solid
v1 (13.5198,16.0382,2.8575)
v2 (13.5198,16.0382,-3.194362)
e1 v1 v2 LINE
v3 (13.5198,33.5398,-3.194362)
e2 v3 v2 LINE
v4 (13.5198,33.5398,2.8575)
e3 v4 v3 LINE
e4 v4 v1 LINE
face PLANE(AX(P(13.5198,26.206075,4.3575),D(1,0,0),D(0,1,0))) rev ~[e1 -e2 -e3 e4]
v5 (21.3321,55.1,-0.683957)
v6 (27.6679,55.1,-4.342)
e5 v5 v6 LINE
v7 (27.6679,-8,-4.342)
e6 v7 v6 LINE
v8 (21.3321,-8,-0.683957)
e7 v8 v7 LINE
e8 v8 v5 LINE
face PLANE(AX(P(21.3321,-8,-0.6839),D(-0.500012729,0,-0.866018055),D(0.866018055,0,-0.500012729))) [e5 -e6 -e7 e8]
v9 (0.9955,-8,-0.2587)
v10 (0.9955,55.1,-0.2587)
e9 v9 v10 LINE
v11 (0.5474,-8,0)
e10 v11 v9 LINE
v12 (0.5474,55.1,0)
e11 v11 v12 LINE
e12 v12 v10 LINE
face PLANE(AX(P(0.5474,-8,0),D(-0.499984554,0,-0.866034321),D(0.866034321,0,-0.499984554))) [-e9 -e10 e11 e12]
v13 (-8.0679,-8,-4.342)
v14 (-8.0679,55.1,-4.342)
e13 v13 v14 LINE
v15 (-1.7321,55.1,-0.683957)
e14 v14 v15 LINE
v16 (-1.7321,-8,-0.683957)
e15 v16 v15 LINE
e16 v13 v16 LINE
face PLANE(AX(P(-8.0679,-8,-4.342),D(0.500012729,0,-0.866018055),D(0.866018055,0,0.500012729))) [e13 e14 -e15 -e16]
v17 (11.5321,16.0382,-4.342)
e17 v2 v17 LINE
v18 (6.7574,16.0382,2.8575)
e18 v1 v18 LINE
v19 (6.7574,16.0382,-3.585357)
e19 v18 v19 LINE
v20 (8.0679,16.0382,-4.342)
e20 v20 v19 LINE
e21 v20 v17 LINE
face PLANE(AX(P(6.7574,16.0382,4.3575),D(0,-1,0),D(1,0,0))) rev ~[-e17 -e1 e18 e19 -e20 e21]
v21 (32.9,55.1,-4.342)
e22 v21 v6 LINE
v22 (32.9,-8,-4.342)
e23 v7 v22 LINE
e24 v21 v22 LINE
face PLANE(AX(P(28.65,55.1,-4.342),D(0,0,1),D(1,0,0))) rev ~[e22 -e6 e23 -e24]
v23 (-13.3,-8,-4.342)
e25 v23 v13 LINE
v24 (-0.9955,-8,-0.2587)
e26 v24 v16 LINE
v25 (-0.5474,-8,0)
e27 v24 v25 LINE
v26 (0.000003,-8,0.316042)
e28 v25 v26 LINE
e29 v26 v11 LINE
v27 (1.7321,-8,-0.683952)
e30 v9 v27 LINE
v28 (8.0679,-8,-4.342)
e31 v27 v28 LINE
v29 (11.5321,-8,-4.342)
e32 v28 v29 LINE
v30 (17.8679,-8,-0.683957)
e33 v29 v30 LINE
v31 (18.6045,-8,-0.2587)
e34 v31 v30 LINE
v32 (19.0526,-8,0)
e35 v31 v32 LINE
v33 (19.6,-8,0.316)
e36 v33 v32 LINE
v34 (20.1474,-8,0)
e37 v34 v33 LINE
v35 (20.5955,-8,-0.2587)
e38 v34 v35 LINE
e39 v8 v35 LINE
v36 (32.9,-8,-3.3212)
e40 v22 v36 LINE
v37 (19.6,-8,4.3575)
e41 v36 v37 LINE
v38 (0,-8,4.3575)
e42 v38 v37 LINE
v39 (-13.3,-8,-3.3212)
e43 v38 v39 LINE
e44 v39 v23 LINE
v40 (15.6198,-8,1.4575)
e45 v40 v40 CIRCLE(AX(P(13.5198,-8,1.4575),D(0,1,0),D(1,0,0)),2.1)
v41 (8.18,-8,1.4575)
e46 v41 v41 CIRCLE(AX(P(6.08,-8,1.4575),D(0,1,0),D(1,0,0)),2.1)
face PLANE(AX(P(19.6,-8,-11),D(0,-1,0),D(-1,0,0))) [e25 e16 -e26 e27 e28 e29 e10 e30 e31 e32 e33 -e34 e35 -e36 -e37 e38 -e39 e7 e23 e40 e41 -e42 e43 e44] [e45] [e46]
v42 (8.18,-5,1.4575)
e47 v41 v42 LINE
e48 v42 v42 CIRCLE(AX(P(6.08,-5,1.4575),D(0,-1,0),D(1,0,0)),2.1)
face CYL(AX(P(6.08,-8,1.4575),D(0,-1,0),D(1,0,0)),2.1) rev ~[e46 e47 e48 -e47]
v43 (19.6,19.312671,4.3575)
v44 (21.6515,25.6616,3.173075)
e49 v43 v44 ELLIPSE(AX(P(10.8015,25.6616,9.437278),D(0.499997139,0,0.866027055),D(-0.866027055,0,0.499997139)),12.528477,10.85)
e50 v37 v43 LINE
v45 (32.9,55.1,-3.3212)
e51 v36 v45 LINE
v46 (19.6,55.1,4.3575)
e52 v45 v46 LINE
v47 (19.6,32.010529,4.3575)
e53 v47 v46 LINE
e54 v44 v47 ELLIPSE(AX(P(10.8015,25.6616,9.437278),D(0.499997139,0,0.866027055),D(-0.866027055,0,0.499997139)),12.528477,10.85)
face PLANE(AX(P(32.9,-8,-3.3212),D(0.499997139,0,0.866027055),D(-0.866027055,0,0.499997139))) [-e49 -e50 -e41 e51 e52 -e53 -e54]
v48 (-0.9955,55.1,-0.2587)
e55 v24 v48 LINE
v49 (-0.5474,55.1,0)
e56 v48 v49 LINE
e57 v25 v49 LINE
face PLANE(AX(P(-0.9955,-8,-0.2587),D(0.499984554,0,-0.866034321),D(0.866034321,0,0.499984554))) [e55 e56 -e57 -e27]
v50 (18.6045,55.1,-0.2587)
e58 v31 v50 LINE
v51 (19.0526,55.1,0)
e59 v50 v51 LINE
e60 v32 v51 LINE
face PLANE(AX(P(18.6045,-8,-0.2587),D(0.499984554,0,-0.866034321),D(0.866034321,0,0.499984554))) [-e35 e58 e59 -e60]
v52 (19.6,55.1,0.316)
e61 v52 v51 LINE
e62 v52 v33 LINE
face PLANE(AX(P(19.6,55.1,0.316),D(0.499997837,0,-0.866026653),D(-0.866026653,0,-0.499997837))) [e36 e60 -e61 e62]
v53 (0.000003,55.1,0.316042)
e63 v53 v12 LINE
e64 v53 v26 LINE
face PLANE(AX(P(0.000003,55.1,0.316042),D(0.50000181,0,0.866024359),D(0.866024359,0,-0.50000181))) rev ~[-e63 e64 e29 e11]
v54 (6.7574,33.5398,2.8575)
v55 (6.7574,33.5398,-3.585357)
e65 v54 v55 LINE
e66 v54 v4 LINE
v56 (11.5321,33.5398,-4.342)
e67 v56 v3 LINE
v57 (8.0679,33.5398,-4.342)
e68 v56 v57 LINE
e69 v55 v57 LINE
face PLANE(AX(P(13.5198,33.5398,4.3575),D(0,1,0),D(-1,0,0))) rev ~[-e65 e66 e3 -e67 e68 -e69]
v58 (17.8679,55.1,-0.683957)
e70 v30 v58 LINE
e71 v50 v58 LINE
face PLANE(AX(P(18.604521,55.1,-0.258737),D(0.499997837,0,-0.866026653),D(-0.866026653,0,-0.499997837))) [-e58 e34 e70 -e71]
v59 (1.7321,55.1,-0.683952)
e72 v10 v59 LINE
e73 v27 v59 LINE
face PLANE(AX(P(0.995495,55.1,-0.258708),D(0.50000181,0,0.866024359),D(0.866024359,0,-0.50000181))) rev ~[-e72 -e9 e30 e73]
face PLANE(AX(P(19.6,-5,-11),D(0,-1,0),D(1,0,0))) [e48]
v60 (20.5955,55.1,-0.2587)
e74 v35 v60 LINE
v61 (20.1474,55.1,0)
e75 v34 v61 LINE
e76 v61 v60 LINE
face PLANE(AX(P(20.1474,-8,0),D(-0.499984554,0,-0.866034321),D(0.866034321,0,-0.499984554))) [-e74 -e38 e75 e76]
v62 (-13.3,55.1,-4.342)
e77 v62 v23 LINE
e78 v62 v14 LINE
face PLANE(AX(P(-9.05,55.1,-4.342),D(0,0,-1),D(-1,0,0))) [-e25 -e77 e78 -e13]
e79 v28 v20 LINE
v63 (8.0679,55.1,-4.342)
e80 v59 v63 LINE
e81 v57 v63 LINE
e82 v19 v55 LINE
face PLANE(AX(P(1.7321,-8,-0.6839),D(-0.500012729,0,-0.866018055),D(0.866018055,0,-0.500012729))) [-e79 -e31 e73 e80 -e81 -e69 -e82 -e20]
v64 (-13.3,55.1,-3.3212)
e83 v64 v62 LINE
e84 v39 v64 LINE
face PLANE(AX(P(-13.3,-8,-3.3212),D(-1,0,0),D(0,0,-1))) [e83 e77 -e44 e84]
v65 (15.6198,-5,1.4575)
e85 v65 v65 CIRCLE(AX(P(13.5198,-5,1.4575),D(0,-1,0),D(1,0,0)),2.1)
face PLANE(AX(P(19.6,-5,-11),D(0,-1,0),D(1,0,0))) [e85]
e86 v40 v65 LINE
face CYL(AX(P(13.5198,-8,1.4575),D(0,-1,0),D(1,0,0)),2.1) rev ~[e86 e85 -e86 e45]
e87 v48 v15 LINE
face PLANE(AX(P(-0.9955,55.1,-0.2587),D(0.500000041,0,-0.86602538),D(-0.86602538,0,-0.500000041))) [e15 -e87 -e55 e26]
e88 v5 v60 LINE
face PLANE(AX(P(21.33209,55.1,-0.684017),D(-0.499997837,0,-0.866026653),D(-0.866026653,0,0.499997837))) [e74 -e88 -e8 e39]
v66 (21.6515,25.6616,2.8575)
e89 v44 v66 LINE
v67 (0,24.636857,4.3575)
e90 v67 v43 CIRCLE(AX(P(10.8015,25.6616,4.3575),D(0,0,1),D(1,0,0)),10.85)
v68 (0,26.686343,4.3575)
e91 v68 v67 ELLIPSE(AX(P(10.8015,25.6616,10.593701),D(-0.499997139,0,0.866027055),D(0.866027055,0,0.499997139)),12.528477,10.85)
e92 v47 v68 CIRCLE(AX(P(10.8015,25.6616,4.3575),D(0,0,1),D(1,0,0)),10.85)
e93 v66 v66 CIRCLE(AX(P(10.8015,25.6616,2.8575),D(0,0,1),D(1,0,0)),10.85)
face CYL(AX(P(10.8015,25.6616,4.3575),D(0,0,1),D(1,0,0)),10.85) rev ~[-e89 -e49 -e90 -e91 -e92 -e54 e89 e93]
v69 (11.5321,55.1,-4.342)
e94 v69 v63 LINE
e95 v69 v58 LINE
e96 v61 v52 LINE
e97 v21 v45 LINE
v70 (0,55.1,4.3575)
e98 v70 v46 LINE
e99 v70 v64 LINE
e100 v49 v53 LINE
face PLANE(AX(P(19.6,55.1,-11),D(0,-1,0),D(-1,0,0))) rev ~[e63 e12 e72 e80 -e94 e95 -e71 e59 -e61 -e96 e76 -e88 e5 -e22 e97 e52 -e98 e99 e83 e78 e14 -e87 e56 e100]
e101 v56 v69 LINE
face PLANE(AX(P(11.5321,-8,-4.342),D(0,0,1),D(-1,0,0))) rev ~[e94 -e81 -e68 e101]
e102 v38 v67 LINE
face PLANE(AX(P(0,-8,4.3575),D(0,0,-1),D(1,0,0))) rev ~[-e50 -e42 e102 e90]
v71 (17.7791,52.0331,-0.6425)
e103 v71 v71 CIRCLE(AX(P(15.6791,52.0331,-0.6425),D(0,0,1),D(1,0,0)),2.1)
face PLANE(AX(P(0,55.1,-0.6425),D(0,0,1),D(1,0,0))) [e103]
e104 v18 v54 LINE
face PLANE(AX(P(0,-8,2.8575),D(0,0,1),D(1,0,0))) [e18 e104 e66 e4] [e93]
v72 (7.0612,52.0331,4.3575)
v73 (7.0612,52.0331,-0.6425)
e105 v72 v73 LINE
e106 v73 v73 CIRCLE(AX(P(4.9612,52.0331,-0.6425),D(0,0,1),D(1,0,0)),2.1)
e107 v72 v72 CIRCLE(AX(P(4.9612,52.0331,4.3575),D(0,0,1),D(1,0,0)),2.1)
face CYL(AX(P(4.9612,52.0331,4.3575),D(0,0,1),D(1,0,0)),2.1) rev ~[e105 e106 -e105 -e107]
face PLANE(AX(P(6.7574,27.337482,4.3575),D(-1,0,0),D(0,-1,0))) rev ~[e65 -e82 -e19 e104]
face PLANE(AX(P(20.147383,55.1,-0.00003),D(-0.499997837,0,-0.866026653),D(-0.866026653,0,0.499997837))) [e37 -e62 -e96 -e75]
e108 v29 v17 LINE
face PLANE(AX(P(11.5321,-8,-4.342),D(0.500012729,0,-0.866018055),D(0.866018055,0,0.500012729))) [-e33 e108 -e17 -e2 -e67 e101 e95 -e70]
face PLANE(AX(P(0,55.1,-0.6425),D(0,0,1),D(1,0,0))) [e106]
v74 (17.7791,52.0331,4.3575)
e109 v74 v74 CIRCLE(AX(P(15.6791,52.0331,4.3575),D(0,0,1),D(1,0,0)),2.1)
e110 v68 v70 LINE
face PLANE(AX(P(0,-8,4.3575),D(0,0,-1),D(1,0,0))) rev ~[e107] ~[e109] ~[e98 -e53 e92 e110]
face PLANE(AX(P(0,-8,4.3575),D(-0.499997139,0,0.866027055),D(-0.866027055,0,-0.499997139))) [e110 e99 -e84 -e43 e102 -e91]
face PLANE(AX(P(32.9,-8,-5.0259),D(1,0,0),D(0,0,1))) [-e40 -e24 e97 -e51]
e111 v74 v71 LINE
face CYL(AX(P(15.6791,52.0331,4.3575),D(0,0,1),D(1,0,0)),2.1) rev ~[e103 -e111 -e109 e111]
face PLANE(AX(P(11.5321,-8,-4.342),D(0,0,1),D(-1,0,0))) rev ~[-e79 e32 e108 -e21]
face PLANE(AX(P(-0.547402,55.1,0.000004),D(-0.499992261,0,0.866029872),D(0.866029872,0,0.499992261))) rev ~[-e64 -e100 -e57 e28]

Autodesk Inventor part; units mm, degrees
ref_plane "YZ Plane" through (0, 0, 0) normal (1, 0, 0) x (0, 1, 0)
ref_plane "XZ Plane" through (0, 0, 0) normal (0, 1, 0) x (-1, 0, 0)
ref_plane "РабПлоскость1" through (19.6, -8, -11) normal (0, -1, 0) x (-1, 0, 0)
sketch "Эскиз1" plane through (19.6, -8, -11) normal (0, -1, 0) x (-1, 0, 0)
  line L0 (29.4, -5.9741) -> (29.4, 5.9741) projected
  line L1 (28.2551, 5.9741) -> (29.4, 5.9741) projected
  line L2 (28.65, 6.658) -> (28.2551, 5.9741) projected
  line L3 (27.6679, 6.658) -> (28.65, 6.658) projected
  line L4 (21.3321, 10.3161) -> (27.6679, 6.658) projected
  line L5 (21.3321, 10.3161) -> (20.35, 10.3161) projected
  line L6 (20.35, 10.3161) -> (20.5955, 10.7413) projected
  line L7 (20.1474, 11) -> (20.5955, 10.7413) projected
  line L8 (20.1474, 11) -> (19.0526, 11) projected
  line L9 (18.6045, 10.7413) -> (19.0526, 11) projected
  line L10 (18.85, 10.3161) -> (18.6045, 10.7413) projected
  line L11 (17.8679, 10.3161) -> (18.85, 10.3161) projected
  line L12 (11.5321, 6.658) -> (17.8679, 10.3161) projected
  line L13 (11.5321, 6.658) -> (10.55, 6.658) projected
  line L14 (10.55, 6.658) -> (10.9449, 5.9741) projected
  line L15 (8.6551, 5.9741) -> (10.9449, 5.9741) projected
  line L16 (9.05, 6.658) -> (8.6551, 5.9741) projected
  line L17 (8.0679, 6.658) -> (9.05, 6.658) projected
  line L18 (1.7321, 10.3161) -> (8.0679, 6.658) projected
  line L19 (1.7321, 10.3161) -> (0.75, 10.3161) projected
  line L20 (0.75, 10.3161) -> (0.9955, 10.7413) projected
  line L21 (0.5474, 11) -> (0.9955, 10.7413) projected
  line L22 (-0.5474, 11) -> (0.5474, 11) projected
  line L23 (-0.9955, 10.7413) -> (-0.5474, 11) projected
  line L24 (-0.75, 10.3161) -> (-0.9955, 10.7413) projected
  line L25 (-1.7321, 10.3161) -> (-0.75, 10.3161) projected
  line L26 (-8.0679, 6.658) -> (-1.7321, 10.3161) projected
  line L27 (-8.0679, 6.658) -> (-9.05, 6.658) projected
  line L28 (-9.05, 6.658) -> (-8.6551, 5.9741) projected
  line L29 (-8.6551, 5.9741) -> (-9.8, 5.9741) projected
  line L30 (-9.8, -5.9741) -> (-9.8, 5.9741) projected
  line L31 (-8.6551, -5.9741) -> (-9.8, -5.9741) projected
  line L32 (-9.05, -6.658) -> (-8.6551, -5.9741) projected
  line L33 (-8.0679, -6.658) -> (-9.05, -6.658) projected
  line L34 (-1.7321, -10.3161) -> (-8.0679, -6.658) projected
  line L35 (-1.7321, -10.3161) -> (-0.75, -10.3161) projected
  line L36 (-0.75, -10.3161) -> (-0.9955, -10.7413) projected
  line L37 (-0.5474, -11) -> (-0.9955, -10.7413) projected
  line L38 (-0.5474, -11) -> (0.5474, -11) projected
  line L39 (0.9955, -10.7413) -> (0.5474, -11) projected
  line L40 (0.75, -10.3161) -> (0.9955, -10.7413) projected
  line L41 (1.7321, -10.3161) -> (0.75, -10.3161) projected
  line L42 (8.0679, -6.658) -> (1.7321, -10.3161) projected
  line L43 (8.0679, -6.658) -> (9.05, -6.658) projected
  line L44 (9.05, -6.658) -> (8.6551, -5.9741) projected
  line L45 (8.6551, -5.9741) -> (10.9449, -5.9741) projected
  line L46 (10.55, -6.658) -> (10.9449, -5.9741) projected
  line L47 (11.5321, -6.658) -> (10.55, -6.658) projected
  line L48 (17.8679, -10.3161) -> (11.5321, -6.658) projected
  line L49 (17.8679, -10.3161) -> (18.85, -10.3161) projected
  line L50 (18.85, -10.3161) -> (18.6045, -10.7413) projected
  line L51 (19.0526, -11) -> (18.6045, -10.7413) projected
  line L52 (19.0526, -11) -> (20.1474, -11) projected
  line L53 (20.5955, -10.7413) -> (20.1474, -11) projected
  line L54 (20.35, -10.3161) -> (20.5955, -10.7413) projected
  line L55 (21.3321, -10.3161) -> (20.35, -10.3161) projected
  line L56 (27.6679, -6.658) -> (21.3321, -10.3161) projected
  line L57 (27.6679, -6.658) -> (28.65, -6.658) projected
  line L58 (28.65, -6.658) -> (28.2551, -5.9741) projected
  line L59 (28.2551, -5.9741) -> (29.4, -5.9741) projected
  circle A0 centre (0, 0) radius 8.1 projected
  circle A1 centre (19.6, 0) radius 8.1 projected
  line L60 (32.9, 3.6373) -> (42.7, 9.2953) projected
  line L61 (42.7, 9.2953) -> (42.7, 24.6529) projected
  line L62 (42.7, 24.6529) -> (29.4, 32.3316) projected
  line L63 (29.4, 32.3316) -> (19.6, 26.6736) projected
  line L64 (19.6, 26.6736) -> (9.8, 32.3316) projected
  line L65 (9.8, 32.3316) -> (0, 26.6736) projected
  line L66 (0, 26.6736) -> (-9.8, 32.3316) projected
  line L67 (-9.8, 32.3316) -> (-23.1, 24.6529) projected
  line L68 (-23.1, 24.6529) -> (-23.1, 9.2953) projected
  line L69 (-23.1, 9.2953) -> (-13.3, 3.6373) projected
  line L70 (-13.3, 3.6373) -> (-13.3, -7.6788) projected
  line L71 (29.4, -5.9741) -> (28.2551, -5.9741) projected
  line L72 (28.2551, -5.9741) -> (28.65, -6.658) projected
  line L73 (28.65, -6.658) -> (27.6679, -6.658) projected
  line L74 (27.6679, -6.658) -> (21.3321, -10.3161) projected
  line L75 (17.8679, -10.3161) -> (11.5321, -6.658) projected
  line L76 (11.5321, -6.658) -> (10.55, -6.658) projected
  line L77 (10.55, -6.658) -> (10.9449, -5.9741) projected
  line L78 (10.9449, -5.9741) -> (8.6551, -5.9741) projected
  line L79 (8.6551, -5.9741) -> (9.05, -6.658) projected
  line L80 (9.05, -6.658) -> (8.0679, -6.658) projected
  line L81 (8.0679, -6.658) -> (1.7321, -10.3161) projected
  line L82 (-1.7321, -10.3161) -> (-8.0679, -6.658) projected
  line L83 (-8.0679, -6.658) -> (-9.05, -6.658) projected
  line L84 (-9.05, -6.658) -> (-8.6551, -5.9741) projected
  line L85 (-8.6551, -5.9741) -> (-9.8, -5.9741) projected
  line L86 (-9.8, -5.9741) -> (-9.8, 5.9741) projected
  line L87 (-9.8, 5.9741) -> (-10.3474, 5.9741) projected
  line L88 (-10.3474, 5.9741) -> (-10.7955, 6.2328) projected
  line L89 (-10.7955, 6.2328) -> (-10.55, 6.658) projected
  line L90 (-10.55, 6.658) -> (-11.5321, 6.658) projected
  line L91 (-11.5321, 6.658) -> (-17.8679, 10.3161) projected
  line L92 (-17.8679, 10.3161) -> (-18.85, 10.3161) projected
  line L93 (-18.85, 10.3161) -> (-18.4551, 11) projected
  line L94 (-18.4551, 11) -> (-19.6, 11) projected
  line L95 (-19.6, 11) -> (-19.6, 22.9482) projected
  line L96 (-19.6, 22.9482) -> (-18.4551, 22.9482) projected
  line L97 (-18.4551, 22.9482) -> (-18.85, 23.6321) projected
  line L98 (-18.85, 23.6321) -> (-17.8679, 23.6321) projected
  line L99 (-17.8679, 23.6321) -> (-11.5321, 27.2902) projected
  line L100 (-11.5321, 27.2902) -> (-10.55, 27.2902) projected
  line L101 (-10.55, 27.2902) -> (-10.7955, 27.7154) projected
  line L102 (-10.7955, 27.7154) -> (-10.3474, 27.9741) projected
  line L103 (-10.3474, 27.9741) -> (-9.2526, 27.9741) projected
  line L104 (-9.2526, 27.9741) -> (-8.8045, 27.7154) projected
  line L105 (-8.8045, 27.7154) -> (-9.05, 27.2902) projected
  line L106 (-9.05, 27.2902) -> (-8.0679, 27.2902) projected
  line L107 (-8.0679, 27.2902) -> (-1.7321, 23.6321) projected
  line L108 (-1.7321, 23.6321) -> (-0.75, 23.6321) projected
  line L109 (-0.75, 23.6321) -> (-1.1449, 22.9482) projected
  line L110 (-1.1449, 22.9482) -> (1.1449, 22.9482) projected
  line L111 (1.1449, 22.9482) -> (0.75, 23.6321) projected
  line L112 (0.75, 23.6321) -> (1.7321, 23.6321) projected
  line L113 (1.7321, 23.6321) -> (8.0679, 27.2902) projected
  line L114 (8.0679, 27.2902) -> (9.05, 27.2902) projected
  line L115 (9.05, 27.2902) -> (8.8045, 27.7154) projected
  line L116 (8.8045, 27.7154) -> (9.2526, 27.9741) projected
  line L117 (9.2526, 27.9741) -> (10.3474, 27.9741) projected
  line L118 (10.3474, 27.9741) -> (10.7955, 27.7154) projected
  line L119 (10.7955, 27.7154) -> (10.55, 27.2902) projected
  line L120 (10.55, 27.2902) -> (11.5321, 27.2902) projected
  line L121 (11.5321, 27.2902) -> (17.8679, 23.6321) projected
  line L122 (17.8679, 23.6321) -> (18.85, 23.6321) projected
  line L123 (18.85, 23.6321) -> (18.4551, 22.9482) projected
  line L124 (18.4551, 22.9482) -> (20.7449, 22.9482) projected
  line L125 (20.7449, 22.9482) -> (20.35, 23.6321) projected
  line L126 (20.35, 23.6321) -> (21.3321, 23.6321) projected
  line L127 (21.3321, 23.6321) -> (27.6679, 27.2902) projected
  line L128 (27.6679, 27.2902) -> (28.65, 27.2902) projected
  line L129 (28.65, 27.2902) -> (28.4045, 27.7154) projected
  line L130 (28.4045, 27.7154) -> (28.8526, 27.9741) projected
  line L131 (28.8526, 27.9741) -> (29.9474, 27.9741) projected
  line L132 (29.9474, 27.9741) -> (30.3955, 27.7154) projected
  line L133 (30.3955, 27.7154) -> (30.15, 27.2902) projected
  line L134 (30.15, 27.2902) -> (31.1321, 27.2902) projected
  line L135 (31.1321, 27.2902) -> (37.4679, 23.6321) projected
  line L136 (37.4679, 23.6321) -> (38.45, 23.6321) projected
  line L137 (38.45, 23.6321) -> (38.0551, 22.9482) projected
  line L138 (38.0551, 22.9482) -> (39.2, 22.9482) projected
  line L139 (39.2, 22.9482) -> (39.2, 11) projected
  line L140 (39.2, 11) -> (38.0551, 11) projected
  line L141 (38.0551, 11) -> (38.45, 10.3161) projected
  line L142 (38.45, 10.3161) -> (37.4679, 10.3161) projected
  line L143 (37.4679, 10.3161) -> (31.1321, 6.658) projected
  line L144 (31.1321, 6.658) -> (30.15, 6.658) projected
  line L145 (30.15, 6.658) -> (30.3955, 6.2328) projected
  line L146 (30.3955, 6.2328) -> (29.9474, 5.9741) projected
  line L147 (29.9474, 5.9741) -> (29.4, 5.9741) projected
  line L148 (29.4, 5.9741) -> (29.4, -5.9741) projected
  line L149 (-13.3, -7.6788) -> (0, -15.3575) projected
  line L150 (0, -15.3575) -> (9.8, -9.6995) projected
  line L151 (9.8, -9.6995) -> (19.6, -15.3575) projected
  line L152 (19.6, -15.3575) -> (32.9, -7.6788) projected
  line L153 (32.9, -7.6788) -> (32.9, 3.6373) projected
  line L154 (21.3321, -10.3161) -> (20.35, -10.3161) projected
  line L155 (20.35, -10.3161) -> (20.5955, -10.7413) projected
  line L156 (20.5955, -10.7413) -> (20.1474, -11) projected
  line L157 (20.1474, -11) -> (19.0526, -11) projected
  line L158 (19.0526, -11) -> (18.6045, -10.7413) projected
  line L159 (18.6045, -10.7413) -> (18.85, -10.3161) projected
  line L160 (18.85, -10.3161) -> (17.8679, -10.3161) projected
  line L161 (1.7321, -10.3161) -> (0.75, -10.3161) projected
  line L162 (0.75, -10.3161) -> (0.9955, -10.7413) projected
  line L163 (0.9955, -10.7413) -> (0.5474, -11) projected
  line L164 (0.5474, -11) -> (-0.5474, -11) projected
  line L165 (-0.5474, -11) -> (-0.9955, -10.7413) projected
  line L166 (-0.9955, -10.7413) -> (-0.75, -10.3161) projected
  line L167 (-0.75, -10.3161) -> (-1.7321, -10.3161) projected
  line L168 (32.9, -5.9741) -> (29.4, -5.9741)
  line L169 (-9.8, -5.9741) -> (-13.3, -5.9741)
  line L170 (19.6, -15.3575) -> (0, -15.3575)
  point P0 (19.6, -11)
ref_plane "РабПлоскость2" through (-38.0502, 55.1, -60.2624) normal (0, -1, 0) x (1, 0, 0)
extrude "Выдавливание1" add sketch "Эскиз1" against normal up to surface (63.1 mm away) contours L168 L153 L152 L151 L150 L149 L70 L169 L31 L32 L33 L34 L35 L36 L37 L38 L39 L40 L41 L42 L43 L44 L45 L46 L47 L48 L49 L50 L51 L52 L53 L54 L55 L56 L57 L58 L59 | L170 L150 L151
sketch "Эскиз2" plane through (0, -8, 4.3575) normal (0, 0, 1) x (1, 0, 0)
  circle A0 centre (10.0964, 32.8819) radius 10.85 projected
  spline S0 degree 3 poles (1.2199, 29.8332) (1.2264, 29.8391) (1.2399, 29.8514) (1.2666, 29.8618) (1.2971, 29.8679) (1.3188, 29.8674) (1.3303, 29.8671) knots 0 0 0 0 0.219432 0.455746 0.710361 1 1 1 1 projected
  line L0 (1.3303, 29.8671) -> (4.8998, 29.6603) projected
  line L1 (4.8998, 29.6603) -> (4.9412, 30.3747) projected
  spline S1 degree 3 poles (4.9412, 30.3747) (4.9436, 30.3952) (4.948, 30.4343) (4.9731, 30.4645) (4.9851, 30.4789) knots 0 0 0 0 0.523055 1 1 1 1 projected
  spline S2 degree 3 poles (4.9851, 30.4789) (5.0002, 30.4888) (5.0301, 30.5084) (5.0658, 30.5096) (5.0835, 30.5102) knots 0 0 0 0 0.505194 1 1 1 1 projected
  spline S3 degree 3 poles (5.0835, 30.5102) (5.0953, 30.507) (5.1242, 30.4991) (5.1574, 30.4755) (5.186, 30.4505) (5.2006, 30.4236) (5.2097, 30.3936) (5.2095, 30.3722) (5.2093, 30.3609) knots 0 0 0 0 0.170693 0.418909 0.563896 0.700202 0.841955 1 1 1 1 projected
  line L2 (5.2093, 30.3609) -> (5.1108, 28.6607) projected
  spline S4 degree 3 poles (5.1108, 28.6607) (5.1075, 28.6439) (5.1004, 28.6081) (5.064, 28.5657) (5.0204, 28.5312) (4.985, 28.5283) (4.9686, 28.5269) knots 0 0 0 0 0.239185 0.507115 0.772399 1 1 1 1 projected
  spline S5 degree 3 poles (4.9686, 28.5269) (4.9527, 28.5298) (4.9195, 28.5357) (4.8843, 28.5622) (4.8611, 28.5897) (4.8491, 28.6156) (4.842, 28.6452) (4.8426, 28.6661) (4.8429, 28.6771) knots 0 0 0 0 0.219722 0.460095 0.585443 0.71296 0.849405 1 1 1 1 projected
  line L3 (4.8429, 28.6771) -> (4.8843, 29.3923) projected
  line L4 (4.8843, 29.3923) -> (1.3148, 29.5991) projected
  spline S6 degree 3 poles (1.3148, 29.5991) (1.2937, 29.6014) (1.254, 29.6057) (1.2233, 29.6311) (1.2089, 29.6431) knots 0 0 0 0 0.529822 1 1 1 1 projected
  spline S7 degree 3 poles (1.2089, 29.6431) (1.1996, 29.6574) (1.1802, 29.6872) (1.1802, 29.7228) (1.1802, 29.7414) knots 0 0 0 0 0.479535 1 1 1 1 projected
  spline S8 degree 3 poles (1.1802, 29.7414) (1.1812, 29.7464) (1.1836, 29.7582) (1.1913, 29.7787) (1.2037, 29.8042) (1.2142, 29.8229) (1.2199, 29.8332) knots 0 0 0 0 0.152278 0.360896 0.649123 1 1 1 1 projected
  line L5 (5.314, 32.1682) -> (5.2899, 31.752) projected
  spline S9 degree 3 poles (5.2899, 31.752) (5.2876, 31.7272) (5.2829, 31.6758) (5.2703, 31.5966) (5.2484, 31.514) (5.2231, 31.428) (5.1921, 31.3426) (5.1551, 31.2607) (5.1134, 31.1842) (5.0808, 31.137) (5.0647, 31.1138) knots 0 0 0 0 0.109156 0.226197 0.350912 0.483159 0.618823 0.74875 0.876439 1 1 1 1 projected
  spline S10 degree 3 poles (5.0647, 31.1138) (5.0604, 31.1082) (5.0508, 31.0957) (5.0277, 31.0797) (4.9933, 31.0643) (4.9651, 31.0584) (4.9487, 31.055) knots 0 0 0 0 0.157275 0.353812 0.623959 1 1 1 1 projected
  spline S11 degree 3 poles (4.9487, 31.055) (4.931, 31.0577) (4.8944, 31.0635) (4.8502, 31.0969) (4.8148, 31.1372) (4.811, 31.1704) (4.8092, 31.1857) knots 0 0 0 0 0.254223 0.52772 0.782584 1 1 1 1 projected
  line L6 (4.8092, 31.1857) -> (4.839, 31.2655) projected
  spline S12 degree 3 poles (4.839, 31.2655) (4.8649, 31.302) (4.9161, 31.3743) (4.9704, 31.4963) (5.009, 31.625) (5.0173, 31.7147) (5.0215, 31.76) knots 0 0 0 0 0.250207 0.496054 0.745305 1 1 1 1 projected
  line L7 (5.0215, 31.76) -> (5.0462, 32.1871) projected
  spline S13 degree 3 poles (5.0462, 32.1871) (5.0465, 32.2279) (5.047, 32.3069) (5.0221, 32.4217) (4.9727, 32.5253) (4.9041, 32.6172) (4.8204, 32.6936) (4.7258, 32.7518) (4.6219, 32.7904) (4.5485, 32.7982) (4.5113, 32.8021) knots 0 0 0 0 0.134588 0.260434 0.384536 0.51119 0.637382 0.756913 0.876544 1 1 1 1 projected
  line L8 (4.5113, 32.8021) -> (4.3969, 32.8004) projected
  line L9 (4.3969, 32.8004) -> (4.3418, 32.7918) projected
  line L10 (4.3418, 32.7918) -> (4.2895, 32.7747) projected
  spline S14 degree 3 poles (4.2895, 32.7747) (4.2759, 32.7681) (4.2464, 32.7539) (4.201, 32.7264) (4.1502, 32.6923) (4.1153, 32.6662) (4.0967, 32.6522) knots 0 0 0 0 0.198705 0.428492 0.695375 1 1 1 1 projected
  line L11 (4.0967, 32.6522) -> (2.7508, 31.4386) projected
  spline S15 degree 3 poles (2.7508, 31.4386) (2.7287, 31.4196) (2.6853, 31.3821) (2.6147, 31.3335) (2.5398, 31.2938) (2.4871, 31.2738) (2.4608, 31.2638) knots 0 0 0 0 0.25594 0.505009 0.752321 1 1 1 1 projected
  line L12 (2.4608, 31.2638) -> (2.3941, 31.2441) projected
  line L13 (2.3941, 31.2441) -> (2.2844, 31.2219) projected
  line L14 (2.2844, 31.2219) -> (2.2184, 31.214) projected
  line L15 (2.2184, 31.214) -> (2.1355, 31.2188) projected
  spline S16 degree 3 poles (2.1355, 31.2188) (2.1073, 31.221) (2.0518, 31.2253) (1.9706, 31.2414) (1.8929, 31.264) (1.8193, 31.2949) (1.7487, 31.3318) (1.6814, 31.3759) (1.6185, 31.428) (1.5798, 31.4669) (1.5603, 31.4866) knots 0 0 0 0 0.130274 0.256409 0.380833 0.502298 0.624003 0.747576 0.872087 1 1 1 1 projected
  spline S17 degree 3 poles (1.5603, 31.4866) (1.5403, 31.5086) (1.501, 31.552) (1.4514, 31.6239) (1.409, 31.6982) (1.3765, 31.777) (1.3515, 31.8588) (1.3368, 31.9447) (1.3286, 32.0337) (1.3307, 32.0942) (1.3317, 32.125) knots 0 0 0 0 0.127376 0.251339 0.373922 0.494219 0.616919 0.74041 0.867775 1 1 1 1 projected
  line L16 (1.3317, 32.125) -> (1.3558, 32.5404) projected
  spline S18 degree 3 poles (1.3558, 32.5404) (1.3581, 32.57) (1.3627, 32.6288) (1.3785, 32.7152) (1.3986, 32.7994) (1.4276, 32.8801) (1.4612, 32.9589) (1.503, 33.0341) (1.5498, 33.1077) (1.5861, 33.1534) (1.6044, 33.1765) knots 0 0 0 0 0.128087 0.254502 0.3786 0.501671 0.623923 0.748156 0.873068 1 1 1 1 projected
  line L17 (1.6044, 33.1765) -> (1.6608, 33.2219) projected
  line L18 (1.6608, 33.2219) -> (1.7278, 33.2323) projected
  spline S19 degree 3 poles (1.7278, 33.2323) (1.7436, 33.2293) (1.7788, 33.2226) (1.8172, 33.1955) (1.8457, 33.1692) (1.862, 33.1468) (1.8715, 33.123) (1.872, 33.1067) (1.8722, 33.0988) knots 0 0 0 0 0.225013 0.500357 0.645758 0.771988 0.888482 1 1 1 1 projected
  line L19 (1.8722, 33.0988) -> (1.8363, 33.0168) projected
  spline S20 degree 3 poles (1.8363, 33.0168) (1.8059, 32.9802) (1.7465, 32.909) (1.6822, 32.7873) (1.6385, 32.66) (1.6288, 32.5716) (1.6239, 32.5274) knots 0 0 0 0 0.262033 0.510647 0.755153 1 1 1 1 projected
  line L20 (1.6239, 32.5274) -> (1.5994, 32.1045) projected
  spline S21 degree 3 poles (1.5994, 32.1045) (1.5993, 32.0662) (1.5991, 31.9907) (1.6258, 31.8801) (1.6754, 31.7771) (1.7439, 31.6831) (1.827, 31.6017) (1.9225, 31.5408) (2.0268, 31.4999) (2.1004, 31.4917) (2.1376, 31.4876) knots 0 0 0 0 0.126552 0.249346 0.372878 0.503227 0.632635 0.755805 0.876214 1 1 1 1 projected
  line L21 (2.1376, 31.4876) -> (2.2344, 31.4904) projected
  spline S22 degree 3 poles (2.2344, 31.4904) (2.2424, 31.4911) (2.2593, 31.4927) (2.2852, 31.4995) (2.3126, 31.5062) (2.3305, 31.5129) (2.3393, 31.5162) knots 0 0 0 0 0.220277 0.47027 0.739664 1 1 1 1 projected
  spline S23 degree 3 poles (2.3393, 31.5162) (2.3561, 31.5216) (2.3912, 31.5327) (2.4427, 31.5592) (2.4967, 31.5921) (2.5308, 31.6198) (2.5487, 31.6344) knots 0 0 0 0 0.217508 0.45648 0.715095 1 1 1 1 projected
  line L22 (2.5487, 31.6344) -> (3.8947, 32.8496) projected
  spline S24 degree 3 poles (3.8947, 32.8496) (3.9135, 32.8658) (3.9528, 32.8998) (4.0224, 32.9431) (4.0991, 32.9892) (4.1556, 33.0157) (4.1849, 33.0295) knots 0 0 0 0 0.216591 0.454587 0.716038 1 1 1 1 projected
  spline S25 degree 3 poles (4.1849, 33.0295) (4.2113, 33.037) (4.2639, 33.0522) (4.3449, 33.067) (4.4272, 33.0731) (4.4823, 33.0718) (4.5101, 33.0711) knots 0 0 0 0 0.249589 0.498449 0.747622 1 1 1 1 projected
  spline S26 degree 3 poles (4.5101, 33.0711) (4.5383, 33.0689) (4.5938, 33.0646) (4.675, 33.0485) (4.7526, 33.0259) (4.8263, 32.995) (4.8966, 32.958) (4.9644, 32.915) (5.0271, 32.8627) (5.0658, 32.8238) (5.0853, 32.8042) knots 0 0 0 0 0.130358 0.256573 0.381077 0.50262 0.624402 0.747414 0.872005 1 1 1 1 projected
  spline S27 degree 3 poles (5.0853, 32.8042) (5.1053, 32.7822) (5.1447, 32.7388) (5.1939, 32.667) (5.2369, 32.5933) (5.2689, 32.5147) (5.2944, 32.4334) (5.3089, 32.3477) (5.317, 32.259) (5.3151, 32.1988) (5.314, 32.1682) knots 0 0 0 0 0.127803 0.252181 0.37416 0.49486 0.61684 0.740744 0.868535 1 1 1 1 projected
  spline S28 degree 3 poles (3.6331, 34.2513) (3.6171, 34.2541) (3.5836, 34.26) (3.549, 34.2875) (3.5256, 34.3149) (3.5136, 34.3409) (3.5065, 34.3704) (3.5071, 34.3913) (3.5074, 34.4023) knots 0 0 0 0 0.219271 0.461203 0.586294 0.713549 0.849714 1 1 1 1 projected
  line L23 (3.5074, 34.4023) -> (3.5487, 35.1167) projected
  line L24 (3.5487, 35.1167) -> (1.7799, 35.2192) projected
  line L25 (1.7799, 35.2192) -> (1.7054, 33.9336) projected
  spline S29 degree 3 poles (1.7054, 33.9336) (1.7021, 33.9168) (1.695, 33.8811) (1.6586, 33.8386) (1.6149, 33.8043) (1.5795, 33.8007) (1.5632, 33.799) knots 0 0 0 0 0.238964 0.506645 0.771683 1 1 1 1 projected
  spline S30 degree 3 poles (1.5632, 33.799) (1.5473, 33.8019) (1.514, 33.8078) (1.4789, 33.8343) (1.4556, 33.8618) (1.4436, 33.8877) (1.4366, 33.917) (1.4371, 33.9376) (1.4374, 33.9483) knots 0 0 0 0 0.220569 0.461868 0.587699 0.715707 0.852678 1 1 1 1 projected
  line L26 (1.4374, 33.9483) -> (1.5192, 35.3612) projected
  spline S31 degree 3 poles (1.5192, 35.3612) (1.5219, 35.3821) (1.5267, 35.4202) (1.5572, 35.4694) (1.6096, 35.494) (1.6479, 35.4943) (1.669, 35.4946) knots 0 0 0 0 0.274617 0.5 0.725383 1 1 1 1 projected
  line L27 (1.669, 35.4946) -> (5.3524, 35.2811) projected
  spline S32 degree 3 poles (5.3524, 35.2811) (5.3733, 35.2785) (5.4113, 35.2737) (5.4605, 35.2432) (5.4851, 35.1908) (5.4855, 35.1525) (5.4857, 35.1314) knots 0 0 0 0 0.274617 0.5 0.725383 1 1 1 1 projected
  line L28 (5.4857, 35.1314) -> (5.4039, 33.7185) projected
  spline S33 degree 3 poles (5.4039, 33.7185) (5.4005, 33.7017) (5.3934, 33.6659) (5.3571, 33.6235) (5.3134, 33.589) (5.278, 33.5861) (5.2617, 33.5847) knots 0 0 0 0 0.239185 0.507115 0.772399 1 1 1 1 projected
  spline S34 degree 3 poles (5.2617, 33.5847) (5.2457, 33.5875) (5.2122, 33.5934) (5.1776, 33.6208) (5.1542, 33.6483) (5.1422, 33.6742) (5.1352, 33.7035) (5.1356, 33.7242) (5.1359, 33.7349) knots 0 0 0 0 0.220114 0.462976 0.588548 0.716293 0.852982 1 1 1 1 projected
  line L29 (5.1359, 33.7349) -> (5.2104, 35.0205) projected
  line L30 (5.2104, 35.0205) -> (3.8168, 35.1012) projected
  line L31 (3.8168, 35.1012) -> (3.7754, 34.3868) projected
  spline S35 degree 3 poles (3.7754, 34.3868) (3.772, 34.3697) (3.7651, 34.3336) (3.7285, 34.2909) (3.6848, 34.2566) (3.6494, 34.253) (3.6331, 34.2513) knots 0 0 0 0 0.241893 0.508544 0.772562 1 1 1 1 projected
  spline S36 degree 3 poles (1.6423, 37.123) (1.6488, 37.1289) (1.6622, 37.1412) (1.689, 37.1516) (1.7195, 37.1577) (1.7411, 37.1572) (1.7527, 37.1569) knots 0 0 0 0 0.219432 0.455746 0.710361 1 1 1 1 projected
  line L32 (1.7527, 37.1569) -> (5.3222, 36.9501) projected
  line L33 (5.3222, 36.9501) -> (5.3636, 37.6645) projected
  spline S37 degree 3 poles (5.3636, 37.6645) (5.3659, 37.685) (5.3704, 37.7241) (5.3955, 37.7543) (5.4074, 37.7687) knots 0 0 0 0 0.523055 1 1 1 1 projected
  spline S38 degree 3 poles (5.4074, 37.7687) (5.4225, 37.7786) (5.4525, 37.7982) (5.4882, 37.7994) (5.5059, 37.8) knots 0 0 0 0 0.505194 1 1 1 1 projected
  spline S39 degree 3 poles (5.5059, 37.8) (5.5177, 37.7967) (5.5466, 37.7889) (5.5798, 37.7652) (5.6084, 37.7402) (5.623, 37.7134) (5.6321, 37.6834) (5.6318, 37.662) (5.6317, 37.6507) knots 0 0 0 0 0.170693 0.418909 0.563896 0.700202 0.841955 1 1 1 1 projected
  line L34 (5.6317, 37.6507) -> (5.5332, 35.9505) projected
  spline S40 degree 3 poles (5.5332, 35.9505) (5.5298, 35.9336) (5.5228, 35.8979) (5.4864, 35.8555) (5.4427, 35.8209) (5.4073, 35.8181) (5.391, 35.8167) knots 0 0 0 0 0.239185 0.507115 0.772399 1 1 1 1 projected
  spline S41 degree 3 poles (5.391, 35.8167) (5.3751, 35.8196) (5.3418, 35.8255) (5.3067, 35.852) (5.2834, 35.8795) (5.2714, 35.9054) (5.2644, 35.935) (5.2649, 35.9559) (5.2652, 35.9669) knots 0 0 0 0 0.219722 0.460095 0.585443 0.71296 0.849405 1 1 1 1 projected
  line L35 (5.2652, 35.9669) -> (5.3067, 36.6821) projected
  line L36 (5.3067, 36.6821) -> (1.7371, 36.8889) projected
  spline S42 degree 3 poles (1.7371, 36.8889) (1.7161, 36.8912) (1.6764, 36.8955) (1.6457, 36.9209) (1.6313, 36.9329) knots 0 0 0 0 0.529822 1 1 1 1 projected
  spline S43 degree 3 poles (1.6313, 36.9329) (1.622, 36.9472) (1.6025, 36.977) (1.6025, 37.0126) (1.6025, 37.0312) knots 0 0 0 0 0.479535 1 1 1 1 projected
  spline S44 degree 3 poles (1.6025, 37.0312) (1.6035, 37.0362) (1.606, 37.048) (1.6136, 37.0685) (1.6261, 37.094) (1.6366, 37.1127) (1.6423, 37.123) knots 0 0 0 0 0.152278 0.360896 0.649123 1 1 1 1 projected
  arc A1 (13.962, 34.3771) -> (13.7634, 30.9503) centre (10.0964, 32.8819) ccw projected
  line L37 (13.962, 34.3771) -> (13.2158, 34.0885) projected
  arc A2 (13.2158, 34.0885) -> (13.0556, 31.3231) centre (10.0964, 32.8819) ccw projected
  line L38 (13.0556, 31.3231) -> (13.7634, 30.9503) projected
  line L39 (14.9235, 33.0029) -> (12.2087, 33.1602) projected
  line L40 (14.9235, 33.0029) -> (14.8772, 32.2042) projected
  line L41 (14.8772, 32.2042) -> (12.1624, 32.3615) projected
  line L42 (12.1624, 32.3615) -> (12.2087, 33.1602) projected
  line L43 (13.5198, 41.5398) -> (6.7574, 41.5398)
  line L44 (6.7574, 41.5398) -> (6.7574, 24.0382)
  line L45 (6.7574, 24.0382) -> (13.5198, 24.0382)
  line L46 (13.5198, 24.0382) -> (13.5198, 41.5398)
  point P0 (0, 8)
extrude "Выдавливание2" cut sketch "Эскиз2" against normal blind 10 contours L46 L37 A2 L44 A1 | A1 L44 L43 L46 | L46 L39 L42 L41 L38 A2 L44 L37 | L46 L41 L42 L39 | L44 A2 L38 L46 A1 | A1 L46 L45 L44
sketch "Эскиз3" plane through (0, -8, 4.3575) normal (0, 0, 1) x (1, 0, 0)
  circle A0 centre (10.8015, 33.6616) radius 10.85 projected
  point P0 (0, 8)
extrude "Выдавливание3" cut sketch "Эскиз3" against normal blind 1.5
sketch "Эскиз4" plane through (0, 55.1, 4.3575) normal (0, 0, 1) x (1, 0, 0)
  point P0 (0, -55.1)
sketch "Эскиз5" plane through (0, 55.1, 4.3575) normal (0, 0, 1) x (1, 0, 0)
  ellipse E0 centre (15.6791, -3.0669) end of major axis (15.6791, -1.0669) minor radius 2 projected
  ellipse E1 centre (4.9612, -3.0669) end of major axis (4.9612, -1.0669) minor radius 2 projected
  circle A0 centre (15.6791, -3.0669) radius 2.1
  circle A1 centre (4.9612, -3.0669) radius 2.1
  point P0 (0, -55.1)
  dimension "d10" = 4.2
  dimension "d11" = 4.2
extrude "Выдавливание4" cut sketch "Эскиз5" against normal blind 5 contours E0 | E1 | A0 | A1
sketch "Эскиз6" plane through (0, 55.1, 4.3575) normal (0, 1, 0) x (1, 0, 0)
  line L0 (-8.6551, 9.3834) -> (-13.3, 9.3834) projected
  line L1 (-13.3, 9.3834) -> (-13.3, 7.6788) projected
  line L2 (-13.3, 7.6788) -> (0, 0) projected
  line L3 (0, 0) -> (19.6, 0) projected
  line L4 (19.6, 0) -> (32.9, 7.6788) projected
  line L5 (32.9, 7.6788) -> (32.9, 9.3834) projected
  line L6 (32.9, 9.3834) -> (28.2551, 9.3834) projected
  line L7 (28.2551, 9.3834) -> (28.65, 8.6995) projected
  line L8 (28.65, 8.6995) -> (27.6679, 8.6995) projected
  line L9 (27.6679, 8.6995) -> (21.3321, 5.0415) projected
  line L10 (21.3321, 5.0415) -> (20.35, 5.0415) projected
  line L11 (20.35, 5.0415) -> (20.5955, 4.6162) projected
  line L12 (20.5955, 4.6162) -> (20.1474, 4.3575) projected
  line L13 (20.1474, 4.3575) -> (19.0526, 4.3575) projected
  line L14 (19.0526, 4.3575) -> (18.6045, 4.6162) projected
  line L15 (18.6045, 4.6162) -> (18.85, 5.0415) projected
  line L16 (18.85, 5.0415) -> (17.8679, 5.0415) projected
  line L17 (17.8679, 5.0415) -> (11.5321, 8.6995) projected
  line L18 (11.5321, 8.6995) -> (10.55, 8.6995) projected
  line L19 (10.55, 8.6995) -> (10.9449, 9.3834) projected
  line L20 (10.9449, 9.3834) -> (8.6551, 9.3834) projected
  line L21 (8.6551, 9.3834) -> (9.05, 8.6995) projected
  line L22 (9.05, 8.6995) -> (8.0679, 8.6995) projected
  line L23 (8.0679, 8.6995) -> (1.7321, 5.0415) projected
  line L24 (1.7321, 5.0415) -> (0.75, 5.0415) projected
  line L25 (0.75, 5.0415) -> (0.9955, 4.6162) projected
  line L26 (0.9955, 4.6162) -> (0.5474, 4.3575) projected
  line L27 (0.5474, 4.3575) -> (-0.5474, 4.3575) projected
  line L28 (-0.5474, 4.3575) -> (-0.9955, 4.6162) projected
  line L29 (-0.9955, 4.6162) -> (-0.75, 5.0415) projected
  line L30 (-0.75, 5.0415) -> (-1.7321, 5.0415) projected
  line L31 (-1.7321, 5.0415) -> (-8.0679, 8.6995) projected
  line L32 (-8.0679, 8.6995) -> (-9.05, 8.6995) projected
  line L33 (-9.05, 8.6995) -> (-8.6551, 9.3834) projected
  circle A0 centre (0, 15.3575) radius 8.1 projected
  line L34 (-0.9955, 4.6162) -> (3.0148, 2.3009)
  line L35 (-0.9955, 4.6162) -> (-14.4085, 12.3602)
  line L36 (-1.543, 3.1506) -> (10.7474, 10.2465)
  line L37 (19.6, 4.0415) -> (9.8, 9.6995) projected
  line L38 (29.4, 9.6995) -> (19.6, 4.0415) projected
  line L39 (8.0679, 8.6995) -> (11.5321, 8.6995)
  line L40 (-9.05, 8.6995) -> (-13.3, 8.6995)
  line L41 (28.65, 8.6995) -> (32.9, 8.6995)
  point P0 (0, 4.3575)
  point P1 (10.55, 8.6995)
  point P2 (0.9955, 4.6162)
  point P3 (0, 4.0415)
extrude "Выдавливание5" cut sketch "Эскиз6" against normal up to surface (63.1 mm away) contours L33 L35 L0 | L35 L33 L40 L1 L0 | L30 L29 L35 | L27 L36 L34 | L25 L24 L36 | L41 L7 L38 L6 L5 | L38 L7 L6 | L21 L36 L20 L37 L19 L39 | L21 L20 L36 | L38 L11 L10 | L37 L20 L19 | L38 L37 L13 | L16 L15 L37
sketch "Эскиз7" plane through (19.6, -8, -11) normal (0, -1, 0) x (1, 0, 0)
  line L0 (-6.0802, 13.8575) -> (-6.0802, 7.8057) projected
  line L1 (-6.0802, 12.4575) -> (-18.1272, 12.4575)
  circle A0 centre (-6.0802, 12.4575) radius 2.1
  line L2 (-6.0209, 10.3575) -> (-1.8209, 10.3575) projected
  circle A1 centre (-13.52, 12.4575) radius 2.1
  line L3 (-11.5321, 6.658) -> (-8.0679, 6.658) projected
  point P0 (-19.6, 11)
  point P1 (-9.8, 6.658)
  dimension "d14" = 4.2
  dimension "d15" = 4.2
  dimension "d17" = 3.72
extrude "Выдавливание6" cut sketch "Эскиз7" against normal blind 3
properties part number "крепеж бок"
